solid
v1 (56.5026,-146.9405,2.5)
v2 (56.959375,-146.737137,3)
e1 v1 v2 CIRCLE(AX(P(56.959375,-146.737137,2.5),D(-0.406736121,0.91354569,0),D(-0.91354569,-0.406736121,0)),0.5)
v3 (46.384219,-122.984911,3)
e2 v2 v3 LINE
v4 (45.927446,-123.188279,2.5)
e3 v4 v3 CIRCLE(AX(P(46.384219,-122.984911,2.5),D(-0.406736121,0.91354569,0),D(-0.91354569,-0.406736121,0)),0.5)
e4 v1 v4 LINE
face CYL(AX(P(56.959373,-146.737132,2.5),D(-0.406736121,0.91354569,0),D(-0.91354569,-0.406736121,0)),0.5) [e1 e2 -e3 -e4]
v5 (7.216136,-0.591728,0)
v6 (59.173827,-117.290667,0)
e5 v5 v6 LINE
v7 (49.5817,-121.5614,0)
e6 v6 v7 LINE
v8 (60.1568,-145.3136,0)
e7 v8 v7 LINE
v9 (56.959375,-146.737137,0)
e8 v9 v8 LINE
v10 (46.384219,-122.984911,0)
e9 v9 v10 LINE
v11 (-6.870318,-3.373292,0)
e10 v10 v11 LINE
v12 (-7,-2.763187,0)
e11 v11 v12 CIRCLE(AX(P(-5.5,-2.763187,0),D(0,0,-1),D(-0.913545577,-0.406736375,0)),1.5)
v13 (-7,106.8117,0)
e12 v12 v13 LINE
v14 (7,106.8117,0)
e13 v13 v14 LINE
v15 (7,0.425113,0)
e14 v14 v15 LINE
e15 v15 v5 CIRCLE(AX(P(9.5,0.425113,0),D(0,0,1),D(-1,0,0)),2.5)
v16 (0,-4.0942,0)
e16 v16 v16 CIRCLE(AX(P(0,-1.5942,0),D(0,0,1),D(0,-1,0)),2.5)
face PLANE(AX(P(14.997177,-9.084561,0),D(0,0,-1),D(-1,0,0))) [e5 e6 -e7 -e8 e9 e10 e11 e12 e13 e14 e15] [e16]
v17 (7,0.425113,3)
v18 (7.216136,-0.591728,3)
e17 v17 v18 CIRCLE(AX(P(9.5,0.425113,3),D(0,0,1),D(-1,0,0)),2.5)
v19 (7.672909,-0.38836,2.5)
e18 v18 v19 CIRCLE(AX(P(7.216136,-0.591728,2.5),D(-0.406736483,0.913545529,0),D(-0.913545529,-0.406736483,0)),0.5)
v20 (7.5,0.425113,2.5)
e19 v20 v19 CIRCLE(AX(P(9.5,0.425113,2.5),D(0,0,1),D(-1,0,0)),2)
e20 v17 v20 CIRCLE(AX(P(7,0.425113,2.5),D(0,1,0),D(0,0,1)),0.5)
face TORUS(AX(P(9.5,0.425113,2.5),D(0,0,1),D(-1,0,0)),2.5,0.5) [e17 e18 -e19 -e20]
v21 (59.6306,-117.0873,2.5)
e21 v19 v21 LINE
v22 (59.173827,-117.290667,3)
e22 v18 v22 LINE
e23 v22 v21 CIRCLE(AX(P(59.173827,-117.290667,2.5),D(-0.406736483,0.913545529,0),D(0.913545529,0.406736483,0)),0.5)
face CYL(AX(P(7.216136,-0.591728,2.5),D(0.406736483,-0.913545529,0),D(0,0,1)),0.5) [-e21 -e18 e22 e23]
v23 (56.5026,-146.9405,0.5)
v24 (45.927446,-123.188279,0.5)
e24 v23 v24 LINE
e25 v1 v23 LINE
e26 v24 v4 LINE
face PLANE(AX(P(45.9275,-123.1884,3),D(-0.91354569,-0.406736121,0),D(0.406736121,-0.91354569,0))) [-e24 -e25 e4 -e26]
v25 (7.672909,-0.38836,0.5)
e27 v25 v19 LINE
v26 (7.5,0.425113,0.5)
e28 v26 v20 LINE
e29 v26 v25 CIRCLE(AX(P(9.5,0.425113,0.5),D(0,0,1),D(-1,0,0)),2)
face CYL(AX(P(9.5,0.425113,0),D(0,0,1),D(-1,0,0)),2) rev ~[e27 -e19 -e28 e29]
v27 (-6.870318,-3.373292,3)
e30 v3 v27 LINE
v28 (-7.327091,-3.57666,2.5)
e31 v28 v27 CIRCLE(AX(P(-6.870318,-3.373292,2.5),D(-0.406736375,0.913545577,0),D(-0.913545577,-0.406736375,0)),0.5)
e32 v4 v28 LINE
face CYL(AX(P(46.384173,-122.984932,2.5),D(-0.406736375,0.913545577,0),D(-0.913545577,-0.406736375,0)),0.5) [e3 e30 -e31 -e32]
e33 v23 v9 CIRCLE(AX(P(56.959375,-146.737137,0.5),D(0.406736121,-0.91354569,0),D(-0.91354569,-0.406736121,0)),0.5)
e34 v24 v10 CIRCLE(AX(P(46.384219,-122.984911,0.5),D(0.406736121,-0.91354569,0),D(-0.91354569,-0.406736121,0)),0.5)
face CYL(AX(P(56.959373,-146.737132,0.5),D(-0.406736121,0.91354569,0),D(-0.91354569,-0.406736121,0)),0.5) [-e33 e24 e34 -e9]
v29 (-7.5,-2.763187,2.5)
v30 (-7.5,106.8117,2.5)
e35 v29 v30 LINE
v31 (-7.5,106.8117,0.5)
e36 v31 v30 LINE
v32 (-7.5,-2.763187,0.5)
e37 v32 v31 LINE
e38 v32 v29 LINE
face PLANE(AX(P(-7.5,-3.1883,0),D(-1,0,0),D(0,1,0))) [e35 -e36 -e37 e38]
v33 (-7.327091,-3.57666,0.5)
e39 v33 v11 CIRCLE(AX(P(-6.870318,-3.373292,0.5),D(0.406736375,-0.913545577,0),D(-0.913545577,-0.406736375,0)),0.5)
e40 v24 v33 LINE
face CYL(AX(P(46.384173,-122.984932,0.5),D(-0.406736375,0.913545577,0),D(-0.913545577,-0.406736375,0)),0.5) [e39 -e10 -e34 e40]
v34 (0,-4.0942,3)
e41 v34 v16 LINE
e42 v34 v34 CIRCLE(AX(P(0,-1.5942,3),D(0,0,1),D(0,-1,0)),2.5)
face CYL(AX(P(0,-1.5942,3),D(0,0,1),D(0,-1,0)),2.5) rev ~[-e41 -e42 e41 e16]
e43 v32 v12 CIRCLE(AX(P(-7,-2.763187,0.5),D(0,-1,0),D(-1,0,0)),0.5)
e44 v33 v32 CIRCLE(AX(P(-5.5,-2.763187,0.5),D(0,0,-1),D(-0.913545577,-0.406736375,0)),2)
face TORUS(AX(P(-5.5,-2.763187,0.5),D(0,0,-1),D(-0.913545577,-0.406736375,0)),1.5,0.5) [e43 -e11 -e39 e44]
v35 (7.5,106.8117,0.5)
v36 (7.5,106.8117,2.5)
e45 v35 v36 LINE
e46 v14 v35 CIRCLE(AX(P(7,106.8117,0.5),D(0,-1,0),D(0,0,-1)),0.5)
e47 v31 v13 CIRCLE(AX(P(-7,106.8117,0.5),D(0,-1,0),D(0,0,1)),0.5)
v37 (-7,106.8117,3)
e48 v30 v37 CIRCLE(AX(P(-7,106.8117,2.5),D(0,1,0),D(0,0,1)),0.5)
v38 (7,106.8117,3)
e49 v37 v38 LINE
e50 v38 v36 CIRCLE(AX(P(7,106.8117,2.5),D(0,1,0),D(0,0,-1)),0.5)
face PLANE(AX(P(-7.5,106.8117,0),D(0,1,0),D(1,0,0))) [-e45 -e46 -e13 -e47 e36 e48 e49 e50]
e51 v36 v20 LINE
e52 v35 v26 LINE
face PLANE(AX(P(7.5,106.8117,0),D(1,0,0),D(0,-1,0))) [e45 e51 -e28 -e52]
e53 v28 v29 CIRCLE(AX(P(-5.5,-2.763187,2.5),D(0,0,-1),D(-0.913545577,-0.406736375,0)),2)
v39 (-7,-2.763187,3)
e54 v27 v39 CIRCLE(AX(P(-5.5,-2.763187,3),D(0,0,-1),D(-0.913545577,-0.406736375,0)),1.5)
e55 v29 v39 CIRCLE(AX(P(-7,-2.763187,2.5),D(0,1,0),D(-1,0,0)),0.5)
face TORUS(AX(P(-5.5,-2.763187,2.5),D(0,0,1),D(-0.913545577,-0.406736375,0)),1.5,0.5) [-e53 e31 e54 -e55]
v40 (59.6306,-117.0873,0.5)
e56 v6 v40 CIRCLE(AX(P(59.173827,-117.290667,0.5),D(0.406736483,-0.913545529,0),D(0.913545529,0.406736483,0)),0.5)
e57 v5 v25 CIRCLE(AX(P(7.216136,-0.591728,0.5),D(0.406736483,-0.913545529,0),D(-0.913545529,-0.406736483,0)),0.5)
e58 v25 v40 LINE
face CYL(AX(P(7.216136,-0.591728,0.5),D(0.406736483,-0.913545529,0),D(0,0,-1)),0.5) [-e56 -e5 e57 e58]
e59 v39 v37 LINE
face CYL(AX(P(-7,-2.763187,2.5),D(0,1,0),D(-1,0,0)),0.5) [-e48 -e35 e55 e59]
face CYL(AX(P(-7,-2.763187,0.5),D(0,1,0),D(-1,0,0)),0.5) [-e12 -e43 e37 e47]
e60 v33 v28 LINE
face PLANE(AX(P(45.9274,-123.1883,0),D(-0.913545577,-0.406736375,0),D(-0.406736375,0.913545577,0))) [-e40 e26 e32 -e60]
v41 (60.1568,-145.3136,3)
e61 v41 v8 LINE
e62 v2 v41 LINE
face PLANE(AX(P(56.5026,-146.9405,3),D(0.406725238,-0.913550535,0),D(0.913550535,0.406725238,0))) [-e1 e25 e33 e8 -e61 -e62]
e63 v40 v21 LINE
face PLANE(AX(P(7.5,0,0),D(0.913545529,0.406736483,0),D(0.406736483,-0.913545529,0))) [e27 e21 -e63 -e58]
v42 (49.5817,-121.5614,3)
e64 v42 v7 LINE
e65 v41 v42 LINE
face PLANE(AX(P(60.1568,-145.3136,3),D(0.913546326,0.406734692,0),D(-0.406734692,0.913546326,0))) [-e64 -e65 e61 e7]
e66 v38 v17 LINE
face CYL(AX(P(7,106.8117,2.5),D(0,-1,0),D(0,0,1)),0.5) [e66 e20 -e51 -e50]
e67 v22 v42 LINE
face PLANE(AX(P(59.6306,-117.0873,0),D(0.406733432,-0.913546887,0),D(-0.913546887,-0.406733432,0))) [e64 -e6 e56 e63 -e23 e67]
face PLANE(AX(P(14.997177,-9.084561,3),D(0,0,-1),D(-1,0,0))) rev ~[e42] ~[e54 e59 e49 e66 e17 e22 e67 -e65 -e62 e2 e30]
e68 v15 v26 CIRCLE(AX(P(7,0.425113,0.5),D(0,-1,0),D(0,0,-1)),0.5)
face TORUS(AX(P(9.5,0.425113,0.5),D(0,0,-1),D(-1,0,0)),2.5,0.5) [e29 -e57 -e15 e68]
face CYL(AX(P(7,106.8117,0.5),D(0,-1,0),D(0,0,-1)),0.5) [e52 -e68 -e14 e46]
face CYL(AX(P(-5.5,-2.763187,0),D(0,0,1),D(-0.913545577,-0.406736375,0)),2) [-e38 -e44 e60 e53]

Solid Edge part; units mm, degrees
sketch "Sketch1" plane through (0, 0, 0) normal (0, 0, 1) x (1, 0, 0)
  line L0 (45.9274, -123.1883) -> (-7.5, -3.1883)
  line L1 (-7.5, -3.1883) -> (-7.5, 106.8117)
  line L2 (-7.5, 106.8117) -> (7.5, 106.8117)
  line L3 (7.5, 106.8117) -> (7.5, 0)
  line L4 (7.5, 0) -> (59.6306, -117.0873)
  line L5 (59.6306, -117.0873) -> (45.9274, -123.1883)
extrude "Protrusion1" add sketch "Sketch1" along normal blind 3
sketch "Sketch2" plane through (33.3013, -25.359, 3) normal (0, 0, 1) x (0, -1, 0)
  line L0 (121.5815, 23.2013) -> (119.9546, 26.8555)
  line L1 (119.9546, 26.8555) -> (96.2024, 16.2804)
  line L2 (96.2024, 16.2804) -> (97.8294, 12.6262)
  line L3 (97.8294, 12.6262) -> (121.5815, 23.2013)
extrude "Protrusion2" add sketch "Sketch2" against normal up to surface (3 mm away)
sketch "Sketch3" plane through (35.3731, -35.2776, 3) normal (0, 0, 1) x (0, -1, 0)
  circle A0 centre (-33.6834, -35.3731) radius 2.5
extrude "Cutout1" cut sketch "Sketch3" against normal up to next
fillet "Arrondis_angles" radius 2 2 edges at (-7.5, -3.1883, 1.5) (7.5, 0, 1.5)
fillet "Arrondis_0" radius 0.5 8 edges at (24.5878, -75.2586, 0) (24.5878, -75.2586, 3) (33.6518, -58.7378, 0) (33.6518, -58.7378, 3) (-7.5, 52.0242, 3) (7.5, 53.6184, 3) (7.5, 53.6184, 0) (-7.5, 52.0242, 0)
properties material "Aluminium, 6061_T6"
